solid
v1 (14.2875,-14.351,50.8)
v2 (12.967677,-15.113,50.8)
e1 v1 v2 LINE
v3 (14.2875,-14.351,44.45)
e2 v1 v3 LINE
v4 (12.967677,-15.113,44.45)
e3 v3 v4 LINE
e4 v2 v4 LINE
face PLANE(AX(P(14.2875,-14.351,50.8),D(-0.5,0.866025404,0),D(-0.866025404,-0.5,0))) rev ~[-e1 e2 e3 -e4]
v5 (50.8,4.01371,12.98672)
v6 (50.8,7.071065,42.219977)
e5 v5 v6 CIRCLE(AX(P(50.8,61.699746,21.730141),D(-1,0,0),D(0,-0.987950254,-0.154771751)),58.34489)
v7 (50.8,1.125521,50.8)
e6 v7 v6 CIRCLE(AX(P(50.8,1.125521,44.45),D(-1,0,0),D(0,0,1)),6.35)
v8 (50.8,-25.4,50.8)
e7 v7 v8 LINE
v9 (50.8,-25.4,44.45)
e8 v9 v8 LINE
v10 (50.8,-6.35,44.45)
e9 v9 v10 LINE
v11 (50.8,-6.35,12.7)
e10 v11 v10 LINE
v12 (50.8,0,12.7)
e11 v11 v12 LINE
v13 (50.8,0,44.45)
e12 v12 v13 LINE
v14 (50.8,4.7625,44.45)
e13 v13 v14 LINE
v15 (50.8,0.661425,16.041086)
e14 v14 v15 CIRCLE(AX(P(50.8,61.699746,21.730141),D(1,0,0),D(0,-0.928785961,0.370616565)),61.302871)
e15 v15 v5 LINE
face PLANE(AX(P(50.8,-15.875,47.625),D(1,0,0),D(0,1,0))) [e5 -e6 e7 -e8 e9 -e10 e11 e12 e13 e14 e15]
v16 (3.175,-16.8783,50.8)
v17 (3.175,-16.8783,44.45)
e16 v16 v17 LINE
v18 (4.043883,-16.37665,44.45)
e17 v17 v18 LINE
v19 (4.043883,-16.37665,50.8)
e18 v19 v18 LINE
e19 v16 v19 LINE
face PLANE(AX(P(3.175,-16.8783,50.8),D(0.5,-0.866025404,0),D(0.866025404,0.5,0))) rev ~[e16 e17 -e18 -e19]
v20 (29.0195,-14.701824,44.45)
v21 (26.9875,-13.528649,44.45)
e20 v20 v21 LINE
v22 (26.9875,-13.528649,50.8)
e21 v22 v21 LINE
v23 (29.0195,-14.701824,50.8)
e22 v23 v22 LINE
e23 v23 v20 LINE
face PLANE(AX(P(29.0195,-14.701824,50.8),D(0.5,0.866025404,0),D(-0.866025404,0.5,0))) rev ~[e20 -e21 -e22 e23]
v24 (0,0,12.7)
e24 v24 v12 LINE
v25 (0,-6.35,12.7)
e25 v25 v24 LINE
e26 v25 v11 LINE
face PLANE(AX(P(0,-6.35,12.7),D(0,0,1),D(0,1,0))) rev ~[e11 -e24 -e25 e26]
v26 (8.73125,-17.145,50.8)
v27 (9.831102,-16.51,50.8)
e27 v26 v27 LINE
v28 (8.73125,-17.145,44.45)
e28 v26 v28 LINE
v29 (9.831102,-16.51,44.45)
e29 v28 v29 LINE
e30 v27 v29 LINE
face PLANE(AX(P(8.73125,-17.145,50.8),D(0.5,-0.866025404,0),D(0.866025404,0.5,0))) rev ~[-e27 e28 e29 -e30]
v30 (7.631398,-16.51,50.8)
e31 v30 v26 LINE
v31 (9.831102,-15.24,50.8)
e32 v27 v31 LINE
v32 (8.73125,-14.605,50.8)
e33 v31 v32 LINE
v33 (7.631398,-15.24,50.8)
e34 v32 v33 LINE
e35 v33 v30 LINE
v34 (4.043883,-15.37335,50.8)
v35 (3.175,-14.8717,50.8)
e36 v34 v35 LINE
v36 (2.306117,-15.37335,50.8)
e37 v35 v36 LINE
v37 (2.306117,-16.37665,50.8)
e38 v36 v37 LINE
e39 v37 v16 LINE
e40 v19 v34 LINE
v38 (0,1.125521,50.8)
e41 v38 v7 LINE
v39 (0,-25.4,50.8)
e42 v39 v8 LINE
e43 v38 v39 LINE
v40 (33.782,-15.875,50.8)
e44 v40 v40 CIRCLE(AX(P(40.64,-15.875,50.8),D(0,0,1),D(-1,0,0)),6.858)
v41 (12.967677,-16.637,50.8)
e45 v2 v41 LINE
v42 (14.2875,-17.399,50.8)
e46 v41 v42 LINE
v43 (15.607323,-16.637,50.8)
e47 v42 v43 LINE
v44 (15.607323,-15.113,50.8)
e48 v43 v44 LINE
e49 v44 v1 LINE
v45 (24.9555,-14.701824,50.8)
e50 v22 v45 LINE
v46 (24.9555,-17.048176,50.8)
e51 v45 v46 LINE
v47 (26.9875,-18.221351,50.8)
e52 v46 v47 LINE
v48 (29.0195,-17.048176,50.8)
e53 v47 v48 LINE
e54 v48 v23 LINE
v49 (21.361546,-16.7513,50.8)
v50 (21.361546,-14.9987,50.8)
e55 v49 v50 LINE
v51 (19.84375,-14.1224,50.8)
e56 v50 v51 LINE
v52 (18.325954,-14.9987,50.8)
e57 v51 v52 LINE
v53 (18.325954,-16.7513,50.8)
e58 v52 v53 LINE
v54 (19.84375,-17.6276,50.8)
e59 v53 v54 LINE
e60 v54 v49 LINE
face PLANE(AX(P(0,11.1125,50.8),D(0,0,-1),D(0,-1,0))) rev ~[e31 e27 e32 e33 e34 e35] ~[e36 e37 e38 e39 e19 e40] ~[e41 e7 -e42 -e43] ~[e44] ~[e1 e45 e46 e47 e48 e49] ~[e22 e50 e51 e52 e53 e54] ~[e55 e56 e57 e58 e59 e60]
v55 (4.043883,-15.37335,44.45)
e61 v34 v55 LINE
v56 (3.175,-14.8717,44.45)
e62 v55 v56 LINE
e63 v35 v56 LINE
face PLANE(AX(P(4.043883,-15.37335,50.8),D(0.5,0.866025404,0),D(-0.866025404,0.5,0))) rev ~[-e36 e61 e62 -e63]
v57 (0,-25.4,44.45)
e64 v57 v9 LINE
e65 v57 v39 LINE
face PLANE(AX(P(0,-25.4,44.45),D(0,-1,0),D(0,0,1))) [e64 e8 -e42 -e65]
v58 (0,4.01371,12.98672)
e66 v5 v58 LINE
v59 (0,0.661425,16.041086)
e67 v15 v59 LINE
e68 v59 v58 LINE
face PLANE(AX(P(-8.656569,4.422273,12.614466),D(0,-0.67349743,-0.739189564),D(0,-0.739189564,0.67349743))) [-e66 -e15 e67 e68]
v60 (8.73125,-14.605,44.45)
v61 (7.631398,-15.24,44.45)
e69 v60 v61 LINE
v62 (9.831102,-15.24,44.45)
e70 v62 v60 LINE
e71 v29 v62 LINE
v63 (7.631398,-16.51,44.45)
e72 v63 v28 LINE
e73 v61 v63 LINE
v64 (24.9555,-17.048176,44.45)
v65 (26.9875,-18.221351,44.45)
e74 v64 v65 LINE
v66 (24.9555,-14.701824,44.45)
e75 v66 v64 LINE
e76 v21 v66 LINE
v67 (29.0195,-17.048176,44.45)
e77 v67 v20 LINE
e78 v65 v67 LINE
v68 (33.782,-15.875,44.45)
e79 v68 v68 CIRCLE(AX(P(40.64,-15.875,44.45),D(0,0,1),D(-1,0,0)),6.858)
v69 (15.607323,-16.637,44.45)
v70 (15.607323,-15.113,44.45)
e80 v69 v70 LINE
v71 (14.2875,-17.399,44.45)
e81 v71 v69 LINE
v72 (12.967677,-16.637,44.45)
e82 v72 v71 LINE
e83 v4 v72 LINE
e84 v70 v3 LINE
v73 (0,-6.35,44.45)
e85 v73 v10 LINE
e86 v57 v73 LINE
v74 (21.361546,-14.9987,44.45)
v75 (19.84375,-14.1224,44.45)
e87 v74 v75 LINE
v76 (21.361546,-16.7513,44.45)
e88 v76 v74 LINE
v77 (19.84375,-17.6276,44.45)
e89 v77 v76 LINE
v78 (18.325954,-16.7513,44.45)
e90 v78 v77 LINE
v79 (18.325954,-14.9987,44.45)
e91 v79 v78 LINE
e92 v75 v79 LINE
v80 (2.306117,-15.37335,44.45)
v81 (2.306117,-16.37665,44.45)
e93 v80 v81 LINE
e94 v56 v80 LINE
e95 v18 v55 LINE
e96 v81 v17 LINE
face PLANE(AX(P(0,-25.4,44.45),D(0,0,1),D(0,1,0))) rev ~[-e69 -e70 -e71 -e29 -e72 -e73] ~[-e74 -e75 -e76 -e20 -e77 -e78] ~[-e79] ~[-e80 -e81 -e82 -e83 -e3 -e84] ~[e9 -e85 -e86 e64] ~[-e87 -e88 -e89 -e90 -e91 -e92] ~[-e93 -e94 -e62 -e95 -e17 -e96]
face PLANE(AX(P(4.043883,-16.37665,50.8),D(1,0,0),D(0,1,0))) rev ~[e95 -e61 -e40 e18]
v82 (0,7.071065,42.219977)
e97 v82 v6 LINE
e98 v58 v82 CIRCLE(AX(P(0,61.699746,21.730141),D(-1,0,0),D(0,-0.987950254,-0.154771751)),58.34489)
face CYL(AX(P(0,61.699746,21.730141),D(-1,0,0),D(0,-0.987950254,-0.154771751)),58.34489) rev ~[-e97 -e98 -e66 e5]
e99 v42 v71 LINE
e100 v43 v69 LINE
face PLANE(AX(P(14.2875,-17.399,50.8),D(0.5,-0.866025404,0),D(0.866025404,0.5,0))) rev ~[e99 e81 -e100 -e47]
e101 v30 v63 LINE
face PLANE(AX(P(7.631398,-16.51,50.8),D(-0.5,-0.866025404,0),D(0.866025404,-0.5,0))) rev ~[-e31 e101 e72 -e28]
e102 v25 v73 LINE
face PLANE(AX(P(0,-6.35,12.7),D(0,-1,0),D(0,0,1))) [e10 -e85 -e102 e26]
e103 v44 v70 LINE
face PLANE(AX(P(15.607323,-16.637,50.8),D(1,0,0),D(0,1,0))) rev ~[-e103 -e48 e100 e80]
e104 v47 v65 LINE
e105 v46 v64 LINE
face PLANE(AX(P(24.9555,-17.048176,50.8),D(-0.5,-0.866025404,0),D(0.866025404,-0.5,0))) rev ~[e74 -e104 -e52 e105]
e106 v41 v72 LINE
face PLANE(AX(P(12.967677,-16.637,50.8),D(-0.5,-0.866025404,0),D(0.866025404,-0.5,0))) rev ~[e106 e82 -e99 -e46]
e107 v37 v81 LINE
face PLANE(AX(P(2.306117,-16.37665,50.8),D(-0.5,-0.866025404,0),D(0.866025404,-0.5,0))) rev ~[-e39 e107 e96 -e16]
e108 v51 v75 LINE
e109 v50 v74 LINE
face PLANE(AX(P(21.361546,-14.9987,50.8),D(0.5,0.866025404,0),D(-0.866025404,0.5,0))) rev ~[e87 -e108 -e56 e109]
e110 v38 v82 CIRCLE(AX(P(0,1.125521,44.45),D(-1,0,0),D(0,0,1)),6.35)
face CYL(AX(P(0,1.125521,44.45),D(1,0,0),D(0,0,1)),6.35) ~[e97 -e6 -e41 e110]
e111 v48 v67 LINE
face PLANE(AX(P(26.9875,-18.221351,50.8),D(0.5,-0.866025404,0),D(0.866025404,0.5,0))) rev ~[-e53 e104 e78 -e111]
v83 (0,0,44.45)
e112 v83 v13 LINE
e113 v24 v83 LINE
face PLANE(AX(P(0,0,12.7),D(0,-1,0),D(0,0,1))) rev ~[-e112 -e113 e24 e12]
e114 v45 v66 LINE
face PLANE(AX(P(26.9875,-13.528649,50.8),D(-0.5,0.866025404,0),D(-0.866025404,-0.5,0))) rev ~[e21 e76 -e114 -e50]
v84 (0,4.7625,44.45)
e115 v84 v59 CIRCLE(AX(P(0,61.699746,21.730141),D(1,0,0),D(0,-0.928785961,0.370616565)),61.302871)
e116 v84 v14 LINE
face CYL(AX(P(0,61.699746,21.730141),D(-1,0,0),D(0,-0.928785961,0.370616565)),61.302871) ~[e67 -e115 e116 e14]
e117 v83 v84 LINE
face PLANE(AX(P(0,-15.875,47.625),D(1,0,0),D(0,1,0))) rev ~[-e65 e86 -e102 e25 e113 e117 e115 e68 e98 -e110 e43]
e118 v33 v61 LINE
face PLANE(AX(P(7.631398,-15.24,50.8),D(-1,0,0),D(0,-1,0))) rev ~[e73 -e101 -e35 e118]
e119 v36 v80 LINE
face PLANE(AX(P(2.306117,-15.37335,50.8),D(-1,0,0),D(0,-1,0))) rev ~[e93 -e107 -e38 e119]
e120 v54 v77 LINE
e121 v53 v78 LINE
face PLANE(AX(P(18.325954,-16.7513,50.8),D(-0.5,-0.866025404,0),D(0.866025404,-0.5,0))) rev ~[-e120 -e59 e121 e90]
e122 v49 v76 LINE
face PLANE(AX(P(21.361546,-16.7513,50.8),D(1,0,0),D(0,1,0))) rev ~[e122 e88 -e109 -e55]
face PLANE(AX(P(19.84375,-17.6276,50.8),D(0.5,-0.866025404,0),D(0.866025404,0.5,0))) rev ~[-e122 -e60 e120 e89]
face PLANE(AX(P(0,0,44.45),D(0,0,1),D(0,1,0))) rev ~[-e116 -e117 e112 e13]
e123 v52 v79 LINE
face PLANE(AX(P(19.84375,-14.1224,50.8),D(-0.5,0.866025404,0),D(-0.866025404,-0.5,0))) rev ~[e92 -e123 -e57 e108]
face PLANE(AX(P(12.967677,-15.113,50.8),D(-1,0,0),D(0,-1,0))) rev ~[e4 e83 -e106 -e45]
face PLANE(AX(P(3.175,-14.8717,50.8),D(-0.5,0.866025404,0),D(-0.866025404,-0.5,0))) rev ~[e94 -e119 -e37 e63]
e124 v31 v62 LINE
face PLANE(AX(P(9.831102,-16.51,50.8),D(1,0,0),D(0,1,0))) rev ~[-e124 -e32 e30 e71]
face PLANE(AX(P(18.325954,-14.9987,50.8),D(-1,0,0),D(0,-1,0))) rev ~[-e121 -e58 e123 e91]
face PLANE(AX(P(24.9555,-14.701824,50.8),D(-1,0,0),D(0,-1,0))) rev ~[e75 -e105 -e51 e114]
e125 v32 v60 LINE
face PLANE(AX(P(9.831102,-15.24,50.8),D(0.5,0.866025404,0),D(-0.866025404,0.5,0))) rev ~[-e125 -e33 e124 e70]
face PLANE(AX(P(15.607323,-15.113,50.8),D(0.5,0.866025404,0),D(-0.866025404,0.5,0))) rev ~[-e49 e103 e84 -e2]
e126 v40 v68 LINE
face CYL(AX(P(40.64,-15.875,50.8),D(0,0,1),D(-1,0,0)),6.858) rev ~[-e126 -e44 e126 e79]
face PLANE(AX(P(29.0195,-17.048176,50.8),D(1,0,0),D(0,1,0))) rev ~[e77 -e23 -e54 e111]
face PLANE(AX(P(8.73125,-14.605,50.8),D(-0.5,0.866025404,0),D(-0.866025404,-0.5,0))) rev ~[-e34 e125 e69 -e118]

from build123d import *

# Parameters (mm, degrees)
F0_W        = 19.05
F0_H        = 6.35
F0_W_2      = 6.35
F0_H_2      = 31.75
F1_DEPTH    = 50.8
F3_DEPTH    = 38.101
F4_R        = 6.35
F5_T1_DEPTH = 68.1131376889


# Not quite as in the source:
# - a fillet or chamfer that OpenCascade refuses, or shapes differently, is made with other operations: its cross-section is extruded or revolved along the edge and cut away or added


with BuildPart() as f1:
    # F0 (on Right) → F1 (new body)
    with BuildSketch(Plane.YZ):
        with Locations((-15.875, 47.625)):
            Rectangle(F0_W, F0_H)
        with Locations((-3.175, 47.625)):
            Rectangle(F0_W_2, F0_H)
        with Locations((-3.175, 28.575)):
            Rectangle(F0_W_2, F0_H_2)
        with BuildLine():
            Line((0, 50.8), (0, 44.45))
            Line((0, 44.45), (4.7625, 44.45))
            ThreePointArc((4.7625, 44.45), (0.8082593776, 28.8201935432), (1.0656091525, 12.7))
            Line((1.0656091525, 12.7), (4.0578971116, 12.7))
            ThreePointArc((4.0578971116, 12.7), (4.3300087855, 32.3527315264), (11.1125, 50.8))
            Line((11.1125, 50.8), (0, 50.8))
        make_face()
    extrude(amount=F1_DEPTH)

    # F2 (on face) → F3 (cut, through all)
    with BuildSketch(Plane.XY.offset(50.8)):
        Polygon((2.3061167124, -15.875), (3.175, -15.875), (4.0438832876, -15.875), (4.0438832876, -15.37335), (3.175, -14.8717), (2.3061167124, -15.37335), align=None)
        Polygon((4.0438832876, -15.875), (3.175, -15.875), (2.3061167124, -15.875), (2.3061167124, -16.37665), (3.175, -16.8783), (4.0438832876, -16.37665), align=None)
        with BuildLine():
            ThreePointArc((47.498, -15.875), (40.64, -9.017), (33.782, -15.875))
            Line((33.782, -15.875), (40.64, -15.875))
            Line((40.64, -15.875), (47.498, -15.875))
        make_face()
        with BuildLine():
            Line((40.64, -15.875), (33.782, -15.875))
            ThreePointArc((33.782, -15.875), (40.64, -22.733), (47.498, -15.875))
            Line((47.498, -15.875), (40.64, -15.875))
        make_face()
        Polygon((24.9555, -14.701824253), (24.9555, -15.875), (26.9875, -15.875), (29.0195, -15.875), (29.0195, -14.701824253), (26.9875, -13.528648506), align=None)
        Polygon((26.9875, -15.875), (24.9555, -15.875), (24.9555, -17.048175747), (26.9875, -18.221351494), (29.0195, -17.048175747), (29.0195, -15.875), align=None)
        Polygon((18.3259538773, -14.9987), (18.3259538773, -15.875), (19.84375, -15.875), (21.3615461227, -15.875), (21.3615461227, -14.9987), (19.84375, -14.1224), align=None)
        Polygon((19.84375, -15.875), (18.3259538773, -15.875), (18.3259538773, -16.7513), (19.84375, -17.6276), (21.3615461227, -16.7513), (21.3615461227, -15.875), align=None)
        Polygon((12.9676772846, -15.113), (12.9676772846, -15.875), (14.2875, -15.875), (15.6073227154, -15.875), (15.6073227154, -15.113), (14.2875, -14.351), align=None)
        Polygon((14.2875, -15.875), (12.9676772846, -15.875), (12.9676772846, -16.637), (14.2875, -17.399), (15.6073227154, -16.637), (15.6073227154, -15.875), align=None)
        Polygon((7.6313977372, -15.24), (7.6313977372, -15.875), (8.73125, -15.875), (9.8311022628, -15.875), (9.8311022628, -15.24), (8.73125, -14.605), align=None)
        Polygon((8.73125, -15.875), (7.6313977372, -15.875), (7.6313977372, -16.51), (8.73125, -17.145), (9.8311022628, -16.51), (9.8311022628, -15.875), align=None)
    extrude(amount=-F3_DEPTH, mode=Mode.SUBTRACT)

    # F4
    f4_edges = [f1.edges().sort_by_distance(p)[0] for p in [
        (25.4, 11.1125, 50.8),
    ]]
    fillet(f4_edges, radius=F4_R)

    # F5: chamfer of 3.175 on 1 edges, made by hand

    # F5_s2 → F5_t1 (cut)
    with BuildSketch(Plane.YZ.offset(-8.6565688444)):
        with BuildLine():
            Line((4.422273237, 12.6144658264), (0.5675477916, 16.1266199594))
            Line((0.5675477916, 16.1266199594), (0.5043218231, 16.1207270056))
            ThreePointArc((0.5043218231, 16.1207270056), (0.7717830499, 14.4079265456), (1.0028018544, 12.690646214))
            Line((1.0028018544, 12.690646214), (1.0656091525, 12.6365))
            ThreePointArc((1.0656091525, 12.6365), (2.7439411948, 12.6365), (4.422273237, 12.5509658264))
            Line((4.422273237, 12.5509658264), (4.422273237, 12.6144658264))
        make_face()
    extrude(amount=F5_T1_DEPTH, mode=Mode.SUBTRACT)


solid = f1.part
